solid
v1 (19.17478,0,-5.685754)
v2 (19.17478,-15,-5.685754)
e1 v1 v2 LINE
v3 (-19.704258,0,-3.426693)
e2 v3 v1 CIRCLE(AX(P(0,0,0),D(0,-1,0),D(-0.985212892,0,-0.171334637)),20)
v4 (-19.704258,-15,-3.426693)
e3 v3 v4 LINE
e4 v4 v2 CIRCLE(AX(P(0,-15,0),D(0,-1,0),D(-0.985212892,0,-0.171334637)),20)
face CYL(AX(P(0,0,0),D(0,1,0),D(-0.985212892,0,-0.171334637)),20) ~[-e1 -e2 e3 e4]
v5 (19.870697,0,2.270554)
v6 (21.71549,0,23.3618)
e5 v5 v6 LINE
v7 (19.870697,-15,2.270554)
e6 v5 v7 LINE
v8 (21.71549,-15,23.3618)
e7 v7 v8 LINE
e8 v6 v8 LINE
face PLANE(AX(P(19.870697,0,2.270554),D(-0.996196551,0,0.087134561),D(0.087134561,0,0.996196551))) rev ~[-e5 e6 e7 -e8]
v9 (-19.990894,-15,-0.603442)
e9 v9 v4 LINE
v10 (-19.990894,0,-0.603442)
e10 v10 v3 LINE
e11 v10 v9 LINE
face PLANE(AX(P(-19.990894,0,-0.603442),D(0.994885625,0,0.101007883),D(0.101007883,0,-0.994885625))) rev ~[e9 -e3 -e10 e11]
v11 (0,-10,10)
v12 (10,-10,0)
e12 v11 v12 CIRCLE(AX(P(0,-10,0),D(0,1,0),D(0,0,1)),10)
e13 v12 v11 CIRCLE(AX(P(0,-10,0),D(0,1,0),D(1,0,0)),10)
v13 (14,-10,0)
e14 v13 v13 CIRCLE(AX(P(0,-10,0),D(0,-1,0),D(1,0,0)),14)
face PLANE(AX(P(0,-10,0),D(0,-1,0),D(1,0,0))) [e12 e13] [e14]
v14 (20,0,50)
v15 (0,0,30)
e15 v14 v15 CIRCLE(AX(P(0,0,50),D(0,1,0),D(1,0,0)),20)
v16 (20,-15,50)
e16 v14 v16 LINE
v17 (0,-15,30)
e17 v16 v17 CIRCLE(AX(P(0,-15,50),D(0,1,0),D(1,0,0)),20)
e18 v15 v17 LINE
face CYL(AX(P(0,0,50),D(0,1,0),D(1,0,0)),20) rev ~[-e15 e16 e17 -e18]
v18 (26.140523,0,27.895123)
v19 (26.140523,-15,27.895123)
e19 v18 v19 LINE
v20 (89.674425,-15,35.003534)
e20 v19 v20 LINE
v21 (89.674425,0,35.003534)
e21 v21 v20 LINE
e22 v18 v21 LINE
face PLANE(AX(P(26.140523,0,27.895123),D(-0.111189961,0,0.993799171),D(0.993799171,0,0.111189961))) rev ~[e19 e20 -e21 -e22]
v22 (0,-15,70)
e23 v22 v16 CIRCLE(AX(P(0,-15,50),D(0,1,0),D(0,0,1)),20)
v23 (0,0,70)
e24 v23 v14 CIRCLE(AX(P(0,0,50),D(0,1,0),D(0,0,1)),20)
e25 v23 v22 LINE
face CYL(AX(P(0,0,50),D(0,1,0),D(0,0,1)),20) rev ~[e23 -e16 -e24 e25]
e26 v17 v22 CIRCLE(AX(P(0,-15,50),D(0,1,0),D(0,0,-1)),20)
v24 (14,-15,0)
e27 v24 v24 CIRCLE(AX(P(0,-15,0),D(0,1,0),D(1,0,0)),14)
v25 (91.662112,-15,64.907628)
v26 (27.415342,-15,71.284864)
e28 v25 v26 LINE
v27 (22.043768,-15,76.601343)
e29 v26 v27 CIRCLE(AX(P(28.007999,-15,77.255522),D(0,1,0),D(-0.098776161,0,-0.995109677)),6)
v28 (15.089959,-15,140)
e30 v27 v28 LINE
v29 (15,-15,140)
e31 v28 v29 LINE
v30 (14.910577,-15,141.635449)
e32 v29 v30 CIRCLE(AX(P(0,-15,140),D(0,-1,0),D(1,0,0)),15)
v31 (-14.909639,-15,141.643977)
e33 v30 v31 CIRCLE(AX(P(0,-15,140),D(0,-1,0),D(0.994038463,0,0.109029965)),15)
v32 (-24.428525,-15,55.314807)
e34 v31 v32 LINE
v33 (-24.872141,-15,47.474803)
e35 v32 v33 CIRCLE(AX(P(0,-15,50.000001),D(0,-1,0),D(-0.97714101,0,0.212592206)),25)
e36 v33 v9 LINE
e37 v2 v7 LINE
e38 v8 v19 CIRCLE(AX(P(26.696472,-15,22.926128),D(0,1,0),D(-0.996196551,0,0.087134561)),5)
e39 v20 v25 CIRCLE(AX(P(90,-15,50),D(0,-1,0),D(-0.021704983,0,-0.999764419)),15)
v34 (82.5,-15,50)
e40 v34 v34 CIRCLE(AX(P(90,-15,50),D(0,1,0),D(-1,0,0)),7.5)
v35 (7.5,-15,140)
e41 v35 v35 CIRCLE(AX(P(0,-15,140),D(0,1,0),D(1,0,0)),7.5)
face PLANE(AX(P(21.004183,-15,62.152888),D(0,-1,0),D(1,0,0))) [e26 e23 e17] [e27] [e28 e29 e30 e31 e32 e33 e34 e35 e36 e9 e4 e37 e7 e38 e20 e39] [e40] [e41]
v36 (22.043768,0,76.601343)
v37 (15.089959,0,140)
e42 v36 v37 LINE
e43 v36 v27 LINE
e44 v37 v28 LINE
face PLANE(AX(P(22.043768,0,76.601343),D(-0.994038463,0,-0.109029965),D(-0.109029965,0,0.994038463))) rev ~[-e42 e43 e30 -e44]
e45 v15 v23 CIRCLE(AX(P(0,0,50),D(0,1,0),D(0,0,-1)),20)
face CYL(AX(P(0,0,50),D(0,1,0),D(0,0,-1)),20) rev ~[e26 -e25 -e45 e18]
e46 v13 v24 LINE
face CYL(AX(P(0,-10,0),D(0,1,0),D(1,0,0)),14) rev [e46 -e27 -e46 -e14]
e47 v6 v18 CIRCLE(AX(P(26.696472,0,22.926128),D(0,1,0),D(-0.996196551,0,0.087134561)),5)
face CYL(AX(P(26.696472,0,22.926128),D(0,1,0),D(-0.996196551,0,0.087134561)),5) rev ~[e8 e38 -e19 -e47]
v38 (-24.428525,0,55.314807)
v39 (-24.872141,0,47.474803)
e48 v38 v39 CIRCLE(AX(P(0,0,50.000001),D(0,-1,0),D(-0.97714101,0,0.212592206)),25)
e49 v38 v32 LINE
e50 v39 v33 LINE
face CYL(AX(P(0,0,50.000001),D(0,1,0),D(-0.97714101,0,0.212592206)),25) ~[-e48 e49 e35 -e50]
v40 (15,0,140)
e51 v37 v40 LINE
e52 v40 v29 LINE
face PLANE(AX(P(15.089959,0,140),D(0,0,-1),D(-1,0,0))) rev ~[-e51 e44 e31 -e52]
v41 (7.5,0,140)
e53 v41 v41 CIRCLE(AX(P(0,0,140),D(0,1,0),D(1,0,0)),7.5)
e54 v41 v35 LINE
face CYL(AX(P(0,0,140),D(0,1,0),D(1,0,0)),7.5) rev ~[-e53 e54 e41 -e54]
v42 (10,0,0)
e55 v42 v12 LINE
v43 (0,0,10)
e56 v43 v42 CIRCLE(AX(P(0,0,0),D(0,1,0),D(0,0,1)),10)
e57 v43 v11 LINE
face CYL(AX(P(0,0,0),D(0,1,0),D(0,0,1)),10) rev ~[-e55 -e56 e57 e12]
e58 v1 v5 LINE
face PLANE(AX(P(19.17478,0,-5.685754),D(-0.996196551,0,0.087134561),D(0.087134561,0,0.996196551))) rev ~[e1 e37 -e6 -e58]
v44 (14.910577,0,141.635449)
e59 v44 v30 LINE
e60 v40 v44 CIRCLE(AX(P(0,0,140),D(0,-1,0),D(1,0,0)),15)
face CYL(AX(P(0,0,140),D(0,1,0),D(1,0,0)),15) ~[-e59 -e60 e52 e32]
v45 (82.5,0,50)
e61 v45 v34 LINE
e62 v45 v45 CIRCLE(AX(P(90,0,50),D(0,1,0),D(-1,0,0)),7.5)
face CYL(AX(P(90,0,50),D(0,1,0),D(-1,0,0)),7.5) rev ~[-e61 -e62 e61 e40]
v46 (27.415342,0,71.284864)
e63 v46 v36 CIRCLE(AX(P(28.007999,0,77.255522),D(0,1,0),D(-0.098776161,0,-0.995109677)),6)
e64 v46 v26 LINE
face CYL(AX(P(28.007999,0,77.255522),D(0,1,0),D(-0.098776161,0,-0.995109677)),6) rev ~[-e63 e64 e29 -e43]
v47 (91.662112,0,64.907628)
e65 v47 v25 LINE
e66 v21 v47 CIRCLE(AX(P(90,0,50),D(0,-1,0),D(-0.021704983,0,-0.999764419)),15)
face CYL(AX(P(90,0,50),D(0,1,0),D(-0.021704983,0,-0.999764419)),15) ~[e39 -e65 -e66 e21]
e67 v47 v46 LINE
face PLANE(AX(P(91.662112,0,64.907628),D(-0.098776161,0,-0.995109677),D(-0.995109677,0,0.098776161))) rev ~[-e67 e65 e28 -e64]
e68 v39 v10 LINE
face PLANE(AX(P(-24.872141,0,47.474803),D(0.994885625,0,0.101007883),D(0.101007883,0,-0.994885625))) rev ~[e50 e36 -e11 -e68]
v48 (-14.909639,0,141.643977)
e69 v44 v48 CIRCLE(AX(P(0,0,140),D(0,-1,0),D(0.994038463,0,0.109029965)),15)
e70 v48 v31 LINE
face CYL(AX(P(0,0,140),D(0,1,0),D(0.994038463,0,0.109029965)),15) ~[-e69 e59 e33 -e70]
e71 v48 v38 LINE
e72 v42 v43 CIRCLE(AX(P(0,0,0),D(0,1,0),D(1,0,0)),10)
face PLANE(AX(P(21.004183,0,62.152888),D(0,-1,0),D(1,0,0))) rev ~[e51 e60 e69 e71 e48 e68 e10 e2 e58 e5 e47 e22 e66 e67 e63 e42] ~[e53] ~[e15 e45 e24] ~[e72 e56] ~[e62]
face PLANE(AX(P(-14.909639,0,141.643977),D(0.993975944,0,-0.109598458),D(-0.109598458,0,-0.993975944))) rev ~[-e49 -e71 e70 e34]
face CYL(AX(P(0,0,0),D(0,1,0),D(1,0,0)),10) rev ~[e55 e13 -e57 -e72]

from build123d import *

# Parameters (mm, degrees)
F1_DEPTH = 15
F3_START = 10
F2_R     = 14
F3_DEPTH = 15


with BuildPart() as f1:
    # F0 (on Front) → F1 (new body)
    with BuildSketch(Plane.XZ):
        with BuildLine():
            Line((-24.8721406347, 47.4748029292), (-19.9908943662, -0.603442158))
            Line((-19.9908943662, -0.603442158), (-19.7042578352, -3.4266927442))
            ThreePointArc((-19.7042578352, -3.4266927442), (-1.1601406694, -19.966323488), (19.1747802681, -5.6857542744))
            Line((19.1747802681, -5.6857542744), (19.8706965994, 2.2705542616))
            Line((19.8706965994, 2.2705542616), (21.7154896457, 23.361800439))
            ThreePointArc((21.7154896457, 23.361800439), (23.1184617772, 26.4186682546), (26.1405225938, 27.895123491))
            Line((26.1405225938, 27.895123491), (89.6744252597, 35.0035337133))
            ThreePointArc((89.6744252597, 35.0035337133), (104.9669737345, 49.0051647211), (91.6621115435, 64.9076284236))
            Line((91.6621115435, 64.9076284236), (27.4153419388, 71.2848644166))
            ThreePointArc((27.4153419388, 71.2848644166), (23.7872845646, 72.9910681825), (22.0437681238, 76.6013426904))
            Line((22.0437681238, 76.6013426904), (15.089959345, 140))
            Line((15.089959345, 140), (15, 140))
            ThreePointArc((15, 140), (14.9776275535, 140.8189461935), (14.910576951, 141.6354494764))
            ThreePointArc((14.910576951, 141.6354494764), (0.0042894025, 154.9999993867), (-14.9096391656, 141.6439768707))
            Line((-14.9096391656, 141.6439768707), (-24.4285254093, 55.3148066248))
            ThreePointArc((-24.4285254093, 55.3148066248), (-24.960074773, 51.4123310642), (-24.8721406347, 47.4748029292))
        make_face()
        with BuildLine():
            ThreePointArc((10, 0), (-7.0710678119, -7.0710678119), (0, 10))
            ThreePointArc((0, 10), (7.0710678119, 7.0710678119), (10, 0))
        make_face(mode=Mode.SUBTRACT)
        with BuildLine():
            ThreePointArc((0, 30), (-20, 50), (0, 70))
            ThreePointArc((0, 70), (14.1421356237, 64.1421356237), (20, 50))
            ThreePointArc((20, 50), (14.1421356237, 35.8578643763), (0, 30))
        make_face(mode=Mode.SUBTRACT)
        with BuildLine():
            ThreePointArc((97.5, 50), (90, 42.5), (82.5, 50))
            ThreePointArc((82.5, 50), (90, 57.5), (97.5, 50))
        make_face(mode=Mode.SUBTRACT)
        with BuildLine():
            ThreePointArc((0, 132.5), (-5.3033008589, 145.3033008589), (7.5, 140))
            ThreePointArc((7.5, 140), (5.3033008589, 134.6966991411), (0, 132.5))
        make_face(mode=Mode.SUBTRACT)
    extrude(amount=F1_DEPTH)

    # F2 (on Front) → F3 (cut)
    with BuildSketch(Plane.XZ.offset(F3_START)):
        Circle(F2_R)
    extrude(amount=F3_DEPTH, mode=Mode.SUBTRACT)


solid = f1.part
